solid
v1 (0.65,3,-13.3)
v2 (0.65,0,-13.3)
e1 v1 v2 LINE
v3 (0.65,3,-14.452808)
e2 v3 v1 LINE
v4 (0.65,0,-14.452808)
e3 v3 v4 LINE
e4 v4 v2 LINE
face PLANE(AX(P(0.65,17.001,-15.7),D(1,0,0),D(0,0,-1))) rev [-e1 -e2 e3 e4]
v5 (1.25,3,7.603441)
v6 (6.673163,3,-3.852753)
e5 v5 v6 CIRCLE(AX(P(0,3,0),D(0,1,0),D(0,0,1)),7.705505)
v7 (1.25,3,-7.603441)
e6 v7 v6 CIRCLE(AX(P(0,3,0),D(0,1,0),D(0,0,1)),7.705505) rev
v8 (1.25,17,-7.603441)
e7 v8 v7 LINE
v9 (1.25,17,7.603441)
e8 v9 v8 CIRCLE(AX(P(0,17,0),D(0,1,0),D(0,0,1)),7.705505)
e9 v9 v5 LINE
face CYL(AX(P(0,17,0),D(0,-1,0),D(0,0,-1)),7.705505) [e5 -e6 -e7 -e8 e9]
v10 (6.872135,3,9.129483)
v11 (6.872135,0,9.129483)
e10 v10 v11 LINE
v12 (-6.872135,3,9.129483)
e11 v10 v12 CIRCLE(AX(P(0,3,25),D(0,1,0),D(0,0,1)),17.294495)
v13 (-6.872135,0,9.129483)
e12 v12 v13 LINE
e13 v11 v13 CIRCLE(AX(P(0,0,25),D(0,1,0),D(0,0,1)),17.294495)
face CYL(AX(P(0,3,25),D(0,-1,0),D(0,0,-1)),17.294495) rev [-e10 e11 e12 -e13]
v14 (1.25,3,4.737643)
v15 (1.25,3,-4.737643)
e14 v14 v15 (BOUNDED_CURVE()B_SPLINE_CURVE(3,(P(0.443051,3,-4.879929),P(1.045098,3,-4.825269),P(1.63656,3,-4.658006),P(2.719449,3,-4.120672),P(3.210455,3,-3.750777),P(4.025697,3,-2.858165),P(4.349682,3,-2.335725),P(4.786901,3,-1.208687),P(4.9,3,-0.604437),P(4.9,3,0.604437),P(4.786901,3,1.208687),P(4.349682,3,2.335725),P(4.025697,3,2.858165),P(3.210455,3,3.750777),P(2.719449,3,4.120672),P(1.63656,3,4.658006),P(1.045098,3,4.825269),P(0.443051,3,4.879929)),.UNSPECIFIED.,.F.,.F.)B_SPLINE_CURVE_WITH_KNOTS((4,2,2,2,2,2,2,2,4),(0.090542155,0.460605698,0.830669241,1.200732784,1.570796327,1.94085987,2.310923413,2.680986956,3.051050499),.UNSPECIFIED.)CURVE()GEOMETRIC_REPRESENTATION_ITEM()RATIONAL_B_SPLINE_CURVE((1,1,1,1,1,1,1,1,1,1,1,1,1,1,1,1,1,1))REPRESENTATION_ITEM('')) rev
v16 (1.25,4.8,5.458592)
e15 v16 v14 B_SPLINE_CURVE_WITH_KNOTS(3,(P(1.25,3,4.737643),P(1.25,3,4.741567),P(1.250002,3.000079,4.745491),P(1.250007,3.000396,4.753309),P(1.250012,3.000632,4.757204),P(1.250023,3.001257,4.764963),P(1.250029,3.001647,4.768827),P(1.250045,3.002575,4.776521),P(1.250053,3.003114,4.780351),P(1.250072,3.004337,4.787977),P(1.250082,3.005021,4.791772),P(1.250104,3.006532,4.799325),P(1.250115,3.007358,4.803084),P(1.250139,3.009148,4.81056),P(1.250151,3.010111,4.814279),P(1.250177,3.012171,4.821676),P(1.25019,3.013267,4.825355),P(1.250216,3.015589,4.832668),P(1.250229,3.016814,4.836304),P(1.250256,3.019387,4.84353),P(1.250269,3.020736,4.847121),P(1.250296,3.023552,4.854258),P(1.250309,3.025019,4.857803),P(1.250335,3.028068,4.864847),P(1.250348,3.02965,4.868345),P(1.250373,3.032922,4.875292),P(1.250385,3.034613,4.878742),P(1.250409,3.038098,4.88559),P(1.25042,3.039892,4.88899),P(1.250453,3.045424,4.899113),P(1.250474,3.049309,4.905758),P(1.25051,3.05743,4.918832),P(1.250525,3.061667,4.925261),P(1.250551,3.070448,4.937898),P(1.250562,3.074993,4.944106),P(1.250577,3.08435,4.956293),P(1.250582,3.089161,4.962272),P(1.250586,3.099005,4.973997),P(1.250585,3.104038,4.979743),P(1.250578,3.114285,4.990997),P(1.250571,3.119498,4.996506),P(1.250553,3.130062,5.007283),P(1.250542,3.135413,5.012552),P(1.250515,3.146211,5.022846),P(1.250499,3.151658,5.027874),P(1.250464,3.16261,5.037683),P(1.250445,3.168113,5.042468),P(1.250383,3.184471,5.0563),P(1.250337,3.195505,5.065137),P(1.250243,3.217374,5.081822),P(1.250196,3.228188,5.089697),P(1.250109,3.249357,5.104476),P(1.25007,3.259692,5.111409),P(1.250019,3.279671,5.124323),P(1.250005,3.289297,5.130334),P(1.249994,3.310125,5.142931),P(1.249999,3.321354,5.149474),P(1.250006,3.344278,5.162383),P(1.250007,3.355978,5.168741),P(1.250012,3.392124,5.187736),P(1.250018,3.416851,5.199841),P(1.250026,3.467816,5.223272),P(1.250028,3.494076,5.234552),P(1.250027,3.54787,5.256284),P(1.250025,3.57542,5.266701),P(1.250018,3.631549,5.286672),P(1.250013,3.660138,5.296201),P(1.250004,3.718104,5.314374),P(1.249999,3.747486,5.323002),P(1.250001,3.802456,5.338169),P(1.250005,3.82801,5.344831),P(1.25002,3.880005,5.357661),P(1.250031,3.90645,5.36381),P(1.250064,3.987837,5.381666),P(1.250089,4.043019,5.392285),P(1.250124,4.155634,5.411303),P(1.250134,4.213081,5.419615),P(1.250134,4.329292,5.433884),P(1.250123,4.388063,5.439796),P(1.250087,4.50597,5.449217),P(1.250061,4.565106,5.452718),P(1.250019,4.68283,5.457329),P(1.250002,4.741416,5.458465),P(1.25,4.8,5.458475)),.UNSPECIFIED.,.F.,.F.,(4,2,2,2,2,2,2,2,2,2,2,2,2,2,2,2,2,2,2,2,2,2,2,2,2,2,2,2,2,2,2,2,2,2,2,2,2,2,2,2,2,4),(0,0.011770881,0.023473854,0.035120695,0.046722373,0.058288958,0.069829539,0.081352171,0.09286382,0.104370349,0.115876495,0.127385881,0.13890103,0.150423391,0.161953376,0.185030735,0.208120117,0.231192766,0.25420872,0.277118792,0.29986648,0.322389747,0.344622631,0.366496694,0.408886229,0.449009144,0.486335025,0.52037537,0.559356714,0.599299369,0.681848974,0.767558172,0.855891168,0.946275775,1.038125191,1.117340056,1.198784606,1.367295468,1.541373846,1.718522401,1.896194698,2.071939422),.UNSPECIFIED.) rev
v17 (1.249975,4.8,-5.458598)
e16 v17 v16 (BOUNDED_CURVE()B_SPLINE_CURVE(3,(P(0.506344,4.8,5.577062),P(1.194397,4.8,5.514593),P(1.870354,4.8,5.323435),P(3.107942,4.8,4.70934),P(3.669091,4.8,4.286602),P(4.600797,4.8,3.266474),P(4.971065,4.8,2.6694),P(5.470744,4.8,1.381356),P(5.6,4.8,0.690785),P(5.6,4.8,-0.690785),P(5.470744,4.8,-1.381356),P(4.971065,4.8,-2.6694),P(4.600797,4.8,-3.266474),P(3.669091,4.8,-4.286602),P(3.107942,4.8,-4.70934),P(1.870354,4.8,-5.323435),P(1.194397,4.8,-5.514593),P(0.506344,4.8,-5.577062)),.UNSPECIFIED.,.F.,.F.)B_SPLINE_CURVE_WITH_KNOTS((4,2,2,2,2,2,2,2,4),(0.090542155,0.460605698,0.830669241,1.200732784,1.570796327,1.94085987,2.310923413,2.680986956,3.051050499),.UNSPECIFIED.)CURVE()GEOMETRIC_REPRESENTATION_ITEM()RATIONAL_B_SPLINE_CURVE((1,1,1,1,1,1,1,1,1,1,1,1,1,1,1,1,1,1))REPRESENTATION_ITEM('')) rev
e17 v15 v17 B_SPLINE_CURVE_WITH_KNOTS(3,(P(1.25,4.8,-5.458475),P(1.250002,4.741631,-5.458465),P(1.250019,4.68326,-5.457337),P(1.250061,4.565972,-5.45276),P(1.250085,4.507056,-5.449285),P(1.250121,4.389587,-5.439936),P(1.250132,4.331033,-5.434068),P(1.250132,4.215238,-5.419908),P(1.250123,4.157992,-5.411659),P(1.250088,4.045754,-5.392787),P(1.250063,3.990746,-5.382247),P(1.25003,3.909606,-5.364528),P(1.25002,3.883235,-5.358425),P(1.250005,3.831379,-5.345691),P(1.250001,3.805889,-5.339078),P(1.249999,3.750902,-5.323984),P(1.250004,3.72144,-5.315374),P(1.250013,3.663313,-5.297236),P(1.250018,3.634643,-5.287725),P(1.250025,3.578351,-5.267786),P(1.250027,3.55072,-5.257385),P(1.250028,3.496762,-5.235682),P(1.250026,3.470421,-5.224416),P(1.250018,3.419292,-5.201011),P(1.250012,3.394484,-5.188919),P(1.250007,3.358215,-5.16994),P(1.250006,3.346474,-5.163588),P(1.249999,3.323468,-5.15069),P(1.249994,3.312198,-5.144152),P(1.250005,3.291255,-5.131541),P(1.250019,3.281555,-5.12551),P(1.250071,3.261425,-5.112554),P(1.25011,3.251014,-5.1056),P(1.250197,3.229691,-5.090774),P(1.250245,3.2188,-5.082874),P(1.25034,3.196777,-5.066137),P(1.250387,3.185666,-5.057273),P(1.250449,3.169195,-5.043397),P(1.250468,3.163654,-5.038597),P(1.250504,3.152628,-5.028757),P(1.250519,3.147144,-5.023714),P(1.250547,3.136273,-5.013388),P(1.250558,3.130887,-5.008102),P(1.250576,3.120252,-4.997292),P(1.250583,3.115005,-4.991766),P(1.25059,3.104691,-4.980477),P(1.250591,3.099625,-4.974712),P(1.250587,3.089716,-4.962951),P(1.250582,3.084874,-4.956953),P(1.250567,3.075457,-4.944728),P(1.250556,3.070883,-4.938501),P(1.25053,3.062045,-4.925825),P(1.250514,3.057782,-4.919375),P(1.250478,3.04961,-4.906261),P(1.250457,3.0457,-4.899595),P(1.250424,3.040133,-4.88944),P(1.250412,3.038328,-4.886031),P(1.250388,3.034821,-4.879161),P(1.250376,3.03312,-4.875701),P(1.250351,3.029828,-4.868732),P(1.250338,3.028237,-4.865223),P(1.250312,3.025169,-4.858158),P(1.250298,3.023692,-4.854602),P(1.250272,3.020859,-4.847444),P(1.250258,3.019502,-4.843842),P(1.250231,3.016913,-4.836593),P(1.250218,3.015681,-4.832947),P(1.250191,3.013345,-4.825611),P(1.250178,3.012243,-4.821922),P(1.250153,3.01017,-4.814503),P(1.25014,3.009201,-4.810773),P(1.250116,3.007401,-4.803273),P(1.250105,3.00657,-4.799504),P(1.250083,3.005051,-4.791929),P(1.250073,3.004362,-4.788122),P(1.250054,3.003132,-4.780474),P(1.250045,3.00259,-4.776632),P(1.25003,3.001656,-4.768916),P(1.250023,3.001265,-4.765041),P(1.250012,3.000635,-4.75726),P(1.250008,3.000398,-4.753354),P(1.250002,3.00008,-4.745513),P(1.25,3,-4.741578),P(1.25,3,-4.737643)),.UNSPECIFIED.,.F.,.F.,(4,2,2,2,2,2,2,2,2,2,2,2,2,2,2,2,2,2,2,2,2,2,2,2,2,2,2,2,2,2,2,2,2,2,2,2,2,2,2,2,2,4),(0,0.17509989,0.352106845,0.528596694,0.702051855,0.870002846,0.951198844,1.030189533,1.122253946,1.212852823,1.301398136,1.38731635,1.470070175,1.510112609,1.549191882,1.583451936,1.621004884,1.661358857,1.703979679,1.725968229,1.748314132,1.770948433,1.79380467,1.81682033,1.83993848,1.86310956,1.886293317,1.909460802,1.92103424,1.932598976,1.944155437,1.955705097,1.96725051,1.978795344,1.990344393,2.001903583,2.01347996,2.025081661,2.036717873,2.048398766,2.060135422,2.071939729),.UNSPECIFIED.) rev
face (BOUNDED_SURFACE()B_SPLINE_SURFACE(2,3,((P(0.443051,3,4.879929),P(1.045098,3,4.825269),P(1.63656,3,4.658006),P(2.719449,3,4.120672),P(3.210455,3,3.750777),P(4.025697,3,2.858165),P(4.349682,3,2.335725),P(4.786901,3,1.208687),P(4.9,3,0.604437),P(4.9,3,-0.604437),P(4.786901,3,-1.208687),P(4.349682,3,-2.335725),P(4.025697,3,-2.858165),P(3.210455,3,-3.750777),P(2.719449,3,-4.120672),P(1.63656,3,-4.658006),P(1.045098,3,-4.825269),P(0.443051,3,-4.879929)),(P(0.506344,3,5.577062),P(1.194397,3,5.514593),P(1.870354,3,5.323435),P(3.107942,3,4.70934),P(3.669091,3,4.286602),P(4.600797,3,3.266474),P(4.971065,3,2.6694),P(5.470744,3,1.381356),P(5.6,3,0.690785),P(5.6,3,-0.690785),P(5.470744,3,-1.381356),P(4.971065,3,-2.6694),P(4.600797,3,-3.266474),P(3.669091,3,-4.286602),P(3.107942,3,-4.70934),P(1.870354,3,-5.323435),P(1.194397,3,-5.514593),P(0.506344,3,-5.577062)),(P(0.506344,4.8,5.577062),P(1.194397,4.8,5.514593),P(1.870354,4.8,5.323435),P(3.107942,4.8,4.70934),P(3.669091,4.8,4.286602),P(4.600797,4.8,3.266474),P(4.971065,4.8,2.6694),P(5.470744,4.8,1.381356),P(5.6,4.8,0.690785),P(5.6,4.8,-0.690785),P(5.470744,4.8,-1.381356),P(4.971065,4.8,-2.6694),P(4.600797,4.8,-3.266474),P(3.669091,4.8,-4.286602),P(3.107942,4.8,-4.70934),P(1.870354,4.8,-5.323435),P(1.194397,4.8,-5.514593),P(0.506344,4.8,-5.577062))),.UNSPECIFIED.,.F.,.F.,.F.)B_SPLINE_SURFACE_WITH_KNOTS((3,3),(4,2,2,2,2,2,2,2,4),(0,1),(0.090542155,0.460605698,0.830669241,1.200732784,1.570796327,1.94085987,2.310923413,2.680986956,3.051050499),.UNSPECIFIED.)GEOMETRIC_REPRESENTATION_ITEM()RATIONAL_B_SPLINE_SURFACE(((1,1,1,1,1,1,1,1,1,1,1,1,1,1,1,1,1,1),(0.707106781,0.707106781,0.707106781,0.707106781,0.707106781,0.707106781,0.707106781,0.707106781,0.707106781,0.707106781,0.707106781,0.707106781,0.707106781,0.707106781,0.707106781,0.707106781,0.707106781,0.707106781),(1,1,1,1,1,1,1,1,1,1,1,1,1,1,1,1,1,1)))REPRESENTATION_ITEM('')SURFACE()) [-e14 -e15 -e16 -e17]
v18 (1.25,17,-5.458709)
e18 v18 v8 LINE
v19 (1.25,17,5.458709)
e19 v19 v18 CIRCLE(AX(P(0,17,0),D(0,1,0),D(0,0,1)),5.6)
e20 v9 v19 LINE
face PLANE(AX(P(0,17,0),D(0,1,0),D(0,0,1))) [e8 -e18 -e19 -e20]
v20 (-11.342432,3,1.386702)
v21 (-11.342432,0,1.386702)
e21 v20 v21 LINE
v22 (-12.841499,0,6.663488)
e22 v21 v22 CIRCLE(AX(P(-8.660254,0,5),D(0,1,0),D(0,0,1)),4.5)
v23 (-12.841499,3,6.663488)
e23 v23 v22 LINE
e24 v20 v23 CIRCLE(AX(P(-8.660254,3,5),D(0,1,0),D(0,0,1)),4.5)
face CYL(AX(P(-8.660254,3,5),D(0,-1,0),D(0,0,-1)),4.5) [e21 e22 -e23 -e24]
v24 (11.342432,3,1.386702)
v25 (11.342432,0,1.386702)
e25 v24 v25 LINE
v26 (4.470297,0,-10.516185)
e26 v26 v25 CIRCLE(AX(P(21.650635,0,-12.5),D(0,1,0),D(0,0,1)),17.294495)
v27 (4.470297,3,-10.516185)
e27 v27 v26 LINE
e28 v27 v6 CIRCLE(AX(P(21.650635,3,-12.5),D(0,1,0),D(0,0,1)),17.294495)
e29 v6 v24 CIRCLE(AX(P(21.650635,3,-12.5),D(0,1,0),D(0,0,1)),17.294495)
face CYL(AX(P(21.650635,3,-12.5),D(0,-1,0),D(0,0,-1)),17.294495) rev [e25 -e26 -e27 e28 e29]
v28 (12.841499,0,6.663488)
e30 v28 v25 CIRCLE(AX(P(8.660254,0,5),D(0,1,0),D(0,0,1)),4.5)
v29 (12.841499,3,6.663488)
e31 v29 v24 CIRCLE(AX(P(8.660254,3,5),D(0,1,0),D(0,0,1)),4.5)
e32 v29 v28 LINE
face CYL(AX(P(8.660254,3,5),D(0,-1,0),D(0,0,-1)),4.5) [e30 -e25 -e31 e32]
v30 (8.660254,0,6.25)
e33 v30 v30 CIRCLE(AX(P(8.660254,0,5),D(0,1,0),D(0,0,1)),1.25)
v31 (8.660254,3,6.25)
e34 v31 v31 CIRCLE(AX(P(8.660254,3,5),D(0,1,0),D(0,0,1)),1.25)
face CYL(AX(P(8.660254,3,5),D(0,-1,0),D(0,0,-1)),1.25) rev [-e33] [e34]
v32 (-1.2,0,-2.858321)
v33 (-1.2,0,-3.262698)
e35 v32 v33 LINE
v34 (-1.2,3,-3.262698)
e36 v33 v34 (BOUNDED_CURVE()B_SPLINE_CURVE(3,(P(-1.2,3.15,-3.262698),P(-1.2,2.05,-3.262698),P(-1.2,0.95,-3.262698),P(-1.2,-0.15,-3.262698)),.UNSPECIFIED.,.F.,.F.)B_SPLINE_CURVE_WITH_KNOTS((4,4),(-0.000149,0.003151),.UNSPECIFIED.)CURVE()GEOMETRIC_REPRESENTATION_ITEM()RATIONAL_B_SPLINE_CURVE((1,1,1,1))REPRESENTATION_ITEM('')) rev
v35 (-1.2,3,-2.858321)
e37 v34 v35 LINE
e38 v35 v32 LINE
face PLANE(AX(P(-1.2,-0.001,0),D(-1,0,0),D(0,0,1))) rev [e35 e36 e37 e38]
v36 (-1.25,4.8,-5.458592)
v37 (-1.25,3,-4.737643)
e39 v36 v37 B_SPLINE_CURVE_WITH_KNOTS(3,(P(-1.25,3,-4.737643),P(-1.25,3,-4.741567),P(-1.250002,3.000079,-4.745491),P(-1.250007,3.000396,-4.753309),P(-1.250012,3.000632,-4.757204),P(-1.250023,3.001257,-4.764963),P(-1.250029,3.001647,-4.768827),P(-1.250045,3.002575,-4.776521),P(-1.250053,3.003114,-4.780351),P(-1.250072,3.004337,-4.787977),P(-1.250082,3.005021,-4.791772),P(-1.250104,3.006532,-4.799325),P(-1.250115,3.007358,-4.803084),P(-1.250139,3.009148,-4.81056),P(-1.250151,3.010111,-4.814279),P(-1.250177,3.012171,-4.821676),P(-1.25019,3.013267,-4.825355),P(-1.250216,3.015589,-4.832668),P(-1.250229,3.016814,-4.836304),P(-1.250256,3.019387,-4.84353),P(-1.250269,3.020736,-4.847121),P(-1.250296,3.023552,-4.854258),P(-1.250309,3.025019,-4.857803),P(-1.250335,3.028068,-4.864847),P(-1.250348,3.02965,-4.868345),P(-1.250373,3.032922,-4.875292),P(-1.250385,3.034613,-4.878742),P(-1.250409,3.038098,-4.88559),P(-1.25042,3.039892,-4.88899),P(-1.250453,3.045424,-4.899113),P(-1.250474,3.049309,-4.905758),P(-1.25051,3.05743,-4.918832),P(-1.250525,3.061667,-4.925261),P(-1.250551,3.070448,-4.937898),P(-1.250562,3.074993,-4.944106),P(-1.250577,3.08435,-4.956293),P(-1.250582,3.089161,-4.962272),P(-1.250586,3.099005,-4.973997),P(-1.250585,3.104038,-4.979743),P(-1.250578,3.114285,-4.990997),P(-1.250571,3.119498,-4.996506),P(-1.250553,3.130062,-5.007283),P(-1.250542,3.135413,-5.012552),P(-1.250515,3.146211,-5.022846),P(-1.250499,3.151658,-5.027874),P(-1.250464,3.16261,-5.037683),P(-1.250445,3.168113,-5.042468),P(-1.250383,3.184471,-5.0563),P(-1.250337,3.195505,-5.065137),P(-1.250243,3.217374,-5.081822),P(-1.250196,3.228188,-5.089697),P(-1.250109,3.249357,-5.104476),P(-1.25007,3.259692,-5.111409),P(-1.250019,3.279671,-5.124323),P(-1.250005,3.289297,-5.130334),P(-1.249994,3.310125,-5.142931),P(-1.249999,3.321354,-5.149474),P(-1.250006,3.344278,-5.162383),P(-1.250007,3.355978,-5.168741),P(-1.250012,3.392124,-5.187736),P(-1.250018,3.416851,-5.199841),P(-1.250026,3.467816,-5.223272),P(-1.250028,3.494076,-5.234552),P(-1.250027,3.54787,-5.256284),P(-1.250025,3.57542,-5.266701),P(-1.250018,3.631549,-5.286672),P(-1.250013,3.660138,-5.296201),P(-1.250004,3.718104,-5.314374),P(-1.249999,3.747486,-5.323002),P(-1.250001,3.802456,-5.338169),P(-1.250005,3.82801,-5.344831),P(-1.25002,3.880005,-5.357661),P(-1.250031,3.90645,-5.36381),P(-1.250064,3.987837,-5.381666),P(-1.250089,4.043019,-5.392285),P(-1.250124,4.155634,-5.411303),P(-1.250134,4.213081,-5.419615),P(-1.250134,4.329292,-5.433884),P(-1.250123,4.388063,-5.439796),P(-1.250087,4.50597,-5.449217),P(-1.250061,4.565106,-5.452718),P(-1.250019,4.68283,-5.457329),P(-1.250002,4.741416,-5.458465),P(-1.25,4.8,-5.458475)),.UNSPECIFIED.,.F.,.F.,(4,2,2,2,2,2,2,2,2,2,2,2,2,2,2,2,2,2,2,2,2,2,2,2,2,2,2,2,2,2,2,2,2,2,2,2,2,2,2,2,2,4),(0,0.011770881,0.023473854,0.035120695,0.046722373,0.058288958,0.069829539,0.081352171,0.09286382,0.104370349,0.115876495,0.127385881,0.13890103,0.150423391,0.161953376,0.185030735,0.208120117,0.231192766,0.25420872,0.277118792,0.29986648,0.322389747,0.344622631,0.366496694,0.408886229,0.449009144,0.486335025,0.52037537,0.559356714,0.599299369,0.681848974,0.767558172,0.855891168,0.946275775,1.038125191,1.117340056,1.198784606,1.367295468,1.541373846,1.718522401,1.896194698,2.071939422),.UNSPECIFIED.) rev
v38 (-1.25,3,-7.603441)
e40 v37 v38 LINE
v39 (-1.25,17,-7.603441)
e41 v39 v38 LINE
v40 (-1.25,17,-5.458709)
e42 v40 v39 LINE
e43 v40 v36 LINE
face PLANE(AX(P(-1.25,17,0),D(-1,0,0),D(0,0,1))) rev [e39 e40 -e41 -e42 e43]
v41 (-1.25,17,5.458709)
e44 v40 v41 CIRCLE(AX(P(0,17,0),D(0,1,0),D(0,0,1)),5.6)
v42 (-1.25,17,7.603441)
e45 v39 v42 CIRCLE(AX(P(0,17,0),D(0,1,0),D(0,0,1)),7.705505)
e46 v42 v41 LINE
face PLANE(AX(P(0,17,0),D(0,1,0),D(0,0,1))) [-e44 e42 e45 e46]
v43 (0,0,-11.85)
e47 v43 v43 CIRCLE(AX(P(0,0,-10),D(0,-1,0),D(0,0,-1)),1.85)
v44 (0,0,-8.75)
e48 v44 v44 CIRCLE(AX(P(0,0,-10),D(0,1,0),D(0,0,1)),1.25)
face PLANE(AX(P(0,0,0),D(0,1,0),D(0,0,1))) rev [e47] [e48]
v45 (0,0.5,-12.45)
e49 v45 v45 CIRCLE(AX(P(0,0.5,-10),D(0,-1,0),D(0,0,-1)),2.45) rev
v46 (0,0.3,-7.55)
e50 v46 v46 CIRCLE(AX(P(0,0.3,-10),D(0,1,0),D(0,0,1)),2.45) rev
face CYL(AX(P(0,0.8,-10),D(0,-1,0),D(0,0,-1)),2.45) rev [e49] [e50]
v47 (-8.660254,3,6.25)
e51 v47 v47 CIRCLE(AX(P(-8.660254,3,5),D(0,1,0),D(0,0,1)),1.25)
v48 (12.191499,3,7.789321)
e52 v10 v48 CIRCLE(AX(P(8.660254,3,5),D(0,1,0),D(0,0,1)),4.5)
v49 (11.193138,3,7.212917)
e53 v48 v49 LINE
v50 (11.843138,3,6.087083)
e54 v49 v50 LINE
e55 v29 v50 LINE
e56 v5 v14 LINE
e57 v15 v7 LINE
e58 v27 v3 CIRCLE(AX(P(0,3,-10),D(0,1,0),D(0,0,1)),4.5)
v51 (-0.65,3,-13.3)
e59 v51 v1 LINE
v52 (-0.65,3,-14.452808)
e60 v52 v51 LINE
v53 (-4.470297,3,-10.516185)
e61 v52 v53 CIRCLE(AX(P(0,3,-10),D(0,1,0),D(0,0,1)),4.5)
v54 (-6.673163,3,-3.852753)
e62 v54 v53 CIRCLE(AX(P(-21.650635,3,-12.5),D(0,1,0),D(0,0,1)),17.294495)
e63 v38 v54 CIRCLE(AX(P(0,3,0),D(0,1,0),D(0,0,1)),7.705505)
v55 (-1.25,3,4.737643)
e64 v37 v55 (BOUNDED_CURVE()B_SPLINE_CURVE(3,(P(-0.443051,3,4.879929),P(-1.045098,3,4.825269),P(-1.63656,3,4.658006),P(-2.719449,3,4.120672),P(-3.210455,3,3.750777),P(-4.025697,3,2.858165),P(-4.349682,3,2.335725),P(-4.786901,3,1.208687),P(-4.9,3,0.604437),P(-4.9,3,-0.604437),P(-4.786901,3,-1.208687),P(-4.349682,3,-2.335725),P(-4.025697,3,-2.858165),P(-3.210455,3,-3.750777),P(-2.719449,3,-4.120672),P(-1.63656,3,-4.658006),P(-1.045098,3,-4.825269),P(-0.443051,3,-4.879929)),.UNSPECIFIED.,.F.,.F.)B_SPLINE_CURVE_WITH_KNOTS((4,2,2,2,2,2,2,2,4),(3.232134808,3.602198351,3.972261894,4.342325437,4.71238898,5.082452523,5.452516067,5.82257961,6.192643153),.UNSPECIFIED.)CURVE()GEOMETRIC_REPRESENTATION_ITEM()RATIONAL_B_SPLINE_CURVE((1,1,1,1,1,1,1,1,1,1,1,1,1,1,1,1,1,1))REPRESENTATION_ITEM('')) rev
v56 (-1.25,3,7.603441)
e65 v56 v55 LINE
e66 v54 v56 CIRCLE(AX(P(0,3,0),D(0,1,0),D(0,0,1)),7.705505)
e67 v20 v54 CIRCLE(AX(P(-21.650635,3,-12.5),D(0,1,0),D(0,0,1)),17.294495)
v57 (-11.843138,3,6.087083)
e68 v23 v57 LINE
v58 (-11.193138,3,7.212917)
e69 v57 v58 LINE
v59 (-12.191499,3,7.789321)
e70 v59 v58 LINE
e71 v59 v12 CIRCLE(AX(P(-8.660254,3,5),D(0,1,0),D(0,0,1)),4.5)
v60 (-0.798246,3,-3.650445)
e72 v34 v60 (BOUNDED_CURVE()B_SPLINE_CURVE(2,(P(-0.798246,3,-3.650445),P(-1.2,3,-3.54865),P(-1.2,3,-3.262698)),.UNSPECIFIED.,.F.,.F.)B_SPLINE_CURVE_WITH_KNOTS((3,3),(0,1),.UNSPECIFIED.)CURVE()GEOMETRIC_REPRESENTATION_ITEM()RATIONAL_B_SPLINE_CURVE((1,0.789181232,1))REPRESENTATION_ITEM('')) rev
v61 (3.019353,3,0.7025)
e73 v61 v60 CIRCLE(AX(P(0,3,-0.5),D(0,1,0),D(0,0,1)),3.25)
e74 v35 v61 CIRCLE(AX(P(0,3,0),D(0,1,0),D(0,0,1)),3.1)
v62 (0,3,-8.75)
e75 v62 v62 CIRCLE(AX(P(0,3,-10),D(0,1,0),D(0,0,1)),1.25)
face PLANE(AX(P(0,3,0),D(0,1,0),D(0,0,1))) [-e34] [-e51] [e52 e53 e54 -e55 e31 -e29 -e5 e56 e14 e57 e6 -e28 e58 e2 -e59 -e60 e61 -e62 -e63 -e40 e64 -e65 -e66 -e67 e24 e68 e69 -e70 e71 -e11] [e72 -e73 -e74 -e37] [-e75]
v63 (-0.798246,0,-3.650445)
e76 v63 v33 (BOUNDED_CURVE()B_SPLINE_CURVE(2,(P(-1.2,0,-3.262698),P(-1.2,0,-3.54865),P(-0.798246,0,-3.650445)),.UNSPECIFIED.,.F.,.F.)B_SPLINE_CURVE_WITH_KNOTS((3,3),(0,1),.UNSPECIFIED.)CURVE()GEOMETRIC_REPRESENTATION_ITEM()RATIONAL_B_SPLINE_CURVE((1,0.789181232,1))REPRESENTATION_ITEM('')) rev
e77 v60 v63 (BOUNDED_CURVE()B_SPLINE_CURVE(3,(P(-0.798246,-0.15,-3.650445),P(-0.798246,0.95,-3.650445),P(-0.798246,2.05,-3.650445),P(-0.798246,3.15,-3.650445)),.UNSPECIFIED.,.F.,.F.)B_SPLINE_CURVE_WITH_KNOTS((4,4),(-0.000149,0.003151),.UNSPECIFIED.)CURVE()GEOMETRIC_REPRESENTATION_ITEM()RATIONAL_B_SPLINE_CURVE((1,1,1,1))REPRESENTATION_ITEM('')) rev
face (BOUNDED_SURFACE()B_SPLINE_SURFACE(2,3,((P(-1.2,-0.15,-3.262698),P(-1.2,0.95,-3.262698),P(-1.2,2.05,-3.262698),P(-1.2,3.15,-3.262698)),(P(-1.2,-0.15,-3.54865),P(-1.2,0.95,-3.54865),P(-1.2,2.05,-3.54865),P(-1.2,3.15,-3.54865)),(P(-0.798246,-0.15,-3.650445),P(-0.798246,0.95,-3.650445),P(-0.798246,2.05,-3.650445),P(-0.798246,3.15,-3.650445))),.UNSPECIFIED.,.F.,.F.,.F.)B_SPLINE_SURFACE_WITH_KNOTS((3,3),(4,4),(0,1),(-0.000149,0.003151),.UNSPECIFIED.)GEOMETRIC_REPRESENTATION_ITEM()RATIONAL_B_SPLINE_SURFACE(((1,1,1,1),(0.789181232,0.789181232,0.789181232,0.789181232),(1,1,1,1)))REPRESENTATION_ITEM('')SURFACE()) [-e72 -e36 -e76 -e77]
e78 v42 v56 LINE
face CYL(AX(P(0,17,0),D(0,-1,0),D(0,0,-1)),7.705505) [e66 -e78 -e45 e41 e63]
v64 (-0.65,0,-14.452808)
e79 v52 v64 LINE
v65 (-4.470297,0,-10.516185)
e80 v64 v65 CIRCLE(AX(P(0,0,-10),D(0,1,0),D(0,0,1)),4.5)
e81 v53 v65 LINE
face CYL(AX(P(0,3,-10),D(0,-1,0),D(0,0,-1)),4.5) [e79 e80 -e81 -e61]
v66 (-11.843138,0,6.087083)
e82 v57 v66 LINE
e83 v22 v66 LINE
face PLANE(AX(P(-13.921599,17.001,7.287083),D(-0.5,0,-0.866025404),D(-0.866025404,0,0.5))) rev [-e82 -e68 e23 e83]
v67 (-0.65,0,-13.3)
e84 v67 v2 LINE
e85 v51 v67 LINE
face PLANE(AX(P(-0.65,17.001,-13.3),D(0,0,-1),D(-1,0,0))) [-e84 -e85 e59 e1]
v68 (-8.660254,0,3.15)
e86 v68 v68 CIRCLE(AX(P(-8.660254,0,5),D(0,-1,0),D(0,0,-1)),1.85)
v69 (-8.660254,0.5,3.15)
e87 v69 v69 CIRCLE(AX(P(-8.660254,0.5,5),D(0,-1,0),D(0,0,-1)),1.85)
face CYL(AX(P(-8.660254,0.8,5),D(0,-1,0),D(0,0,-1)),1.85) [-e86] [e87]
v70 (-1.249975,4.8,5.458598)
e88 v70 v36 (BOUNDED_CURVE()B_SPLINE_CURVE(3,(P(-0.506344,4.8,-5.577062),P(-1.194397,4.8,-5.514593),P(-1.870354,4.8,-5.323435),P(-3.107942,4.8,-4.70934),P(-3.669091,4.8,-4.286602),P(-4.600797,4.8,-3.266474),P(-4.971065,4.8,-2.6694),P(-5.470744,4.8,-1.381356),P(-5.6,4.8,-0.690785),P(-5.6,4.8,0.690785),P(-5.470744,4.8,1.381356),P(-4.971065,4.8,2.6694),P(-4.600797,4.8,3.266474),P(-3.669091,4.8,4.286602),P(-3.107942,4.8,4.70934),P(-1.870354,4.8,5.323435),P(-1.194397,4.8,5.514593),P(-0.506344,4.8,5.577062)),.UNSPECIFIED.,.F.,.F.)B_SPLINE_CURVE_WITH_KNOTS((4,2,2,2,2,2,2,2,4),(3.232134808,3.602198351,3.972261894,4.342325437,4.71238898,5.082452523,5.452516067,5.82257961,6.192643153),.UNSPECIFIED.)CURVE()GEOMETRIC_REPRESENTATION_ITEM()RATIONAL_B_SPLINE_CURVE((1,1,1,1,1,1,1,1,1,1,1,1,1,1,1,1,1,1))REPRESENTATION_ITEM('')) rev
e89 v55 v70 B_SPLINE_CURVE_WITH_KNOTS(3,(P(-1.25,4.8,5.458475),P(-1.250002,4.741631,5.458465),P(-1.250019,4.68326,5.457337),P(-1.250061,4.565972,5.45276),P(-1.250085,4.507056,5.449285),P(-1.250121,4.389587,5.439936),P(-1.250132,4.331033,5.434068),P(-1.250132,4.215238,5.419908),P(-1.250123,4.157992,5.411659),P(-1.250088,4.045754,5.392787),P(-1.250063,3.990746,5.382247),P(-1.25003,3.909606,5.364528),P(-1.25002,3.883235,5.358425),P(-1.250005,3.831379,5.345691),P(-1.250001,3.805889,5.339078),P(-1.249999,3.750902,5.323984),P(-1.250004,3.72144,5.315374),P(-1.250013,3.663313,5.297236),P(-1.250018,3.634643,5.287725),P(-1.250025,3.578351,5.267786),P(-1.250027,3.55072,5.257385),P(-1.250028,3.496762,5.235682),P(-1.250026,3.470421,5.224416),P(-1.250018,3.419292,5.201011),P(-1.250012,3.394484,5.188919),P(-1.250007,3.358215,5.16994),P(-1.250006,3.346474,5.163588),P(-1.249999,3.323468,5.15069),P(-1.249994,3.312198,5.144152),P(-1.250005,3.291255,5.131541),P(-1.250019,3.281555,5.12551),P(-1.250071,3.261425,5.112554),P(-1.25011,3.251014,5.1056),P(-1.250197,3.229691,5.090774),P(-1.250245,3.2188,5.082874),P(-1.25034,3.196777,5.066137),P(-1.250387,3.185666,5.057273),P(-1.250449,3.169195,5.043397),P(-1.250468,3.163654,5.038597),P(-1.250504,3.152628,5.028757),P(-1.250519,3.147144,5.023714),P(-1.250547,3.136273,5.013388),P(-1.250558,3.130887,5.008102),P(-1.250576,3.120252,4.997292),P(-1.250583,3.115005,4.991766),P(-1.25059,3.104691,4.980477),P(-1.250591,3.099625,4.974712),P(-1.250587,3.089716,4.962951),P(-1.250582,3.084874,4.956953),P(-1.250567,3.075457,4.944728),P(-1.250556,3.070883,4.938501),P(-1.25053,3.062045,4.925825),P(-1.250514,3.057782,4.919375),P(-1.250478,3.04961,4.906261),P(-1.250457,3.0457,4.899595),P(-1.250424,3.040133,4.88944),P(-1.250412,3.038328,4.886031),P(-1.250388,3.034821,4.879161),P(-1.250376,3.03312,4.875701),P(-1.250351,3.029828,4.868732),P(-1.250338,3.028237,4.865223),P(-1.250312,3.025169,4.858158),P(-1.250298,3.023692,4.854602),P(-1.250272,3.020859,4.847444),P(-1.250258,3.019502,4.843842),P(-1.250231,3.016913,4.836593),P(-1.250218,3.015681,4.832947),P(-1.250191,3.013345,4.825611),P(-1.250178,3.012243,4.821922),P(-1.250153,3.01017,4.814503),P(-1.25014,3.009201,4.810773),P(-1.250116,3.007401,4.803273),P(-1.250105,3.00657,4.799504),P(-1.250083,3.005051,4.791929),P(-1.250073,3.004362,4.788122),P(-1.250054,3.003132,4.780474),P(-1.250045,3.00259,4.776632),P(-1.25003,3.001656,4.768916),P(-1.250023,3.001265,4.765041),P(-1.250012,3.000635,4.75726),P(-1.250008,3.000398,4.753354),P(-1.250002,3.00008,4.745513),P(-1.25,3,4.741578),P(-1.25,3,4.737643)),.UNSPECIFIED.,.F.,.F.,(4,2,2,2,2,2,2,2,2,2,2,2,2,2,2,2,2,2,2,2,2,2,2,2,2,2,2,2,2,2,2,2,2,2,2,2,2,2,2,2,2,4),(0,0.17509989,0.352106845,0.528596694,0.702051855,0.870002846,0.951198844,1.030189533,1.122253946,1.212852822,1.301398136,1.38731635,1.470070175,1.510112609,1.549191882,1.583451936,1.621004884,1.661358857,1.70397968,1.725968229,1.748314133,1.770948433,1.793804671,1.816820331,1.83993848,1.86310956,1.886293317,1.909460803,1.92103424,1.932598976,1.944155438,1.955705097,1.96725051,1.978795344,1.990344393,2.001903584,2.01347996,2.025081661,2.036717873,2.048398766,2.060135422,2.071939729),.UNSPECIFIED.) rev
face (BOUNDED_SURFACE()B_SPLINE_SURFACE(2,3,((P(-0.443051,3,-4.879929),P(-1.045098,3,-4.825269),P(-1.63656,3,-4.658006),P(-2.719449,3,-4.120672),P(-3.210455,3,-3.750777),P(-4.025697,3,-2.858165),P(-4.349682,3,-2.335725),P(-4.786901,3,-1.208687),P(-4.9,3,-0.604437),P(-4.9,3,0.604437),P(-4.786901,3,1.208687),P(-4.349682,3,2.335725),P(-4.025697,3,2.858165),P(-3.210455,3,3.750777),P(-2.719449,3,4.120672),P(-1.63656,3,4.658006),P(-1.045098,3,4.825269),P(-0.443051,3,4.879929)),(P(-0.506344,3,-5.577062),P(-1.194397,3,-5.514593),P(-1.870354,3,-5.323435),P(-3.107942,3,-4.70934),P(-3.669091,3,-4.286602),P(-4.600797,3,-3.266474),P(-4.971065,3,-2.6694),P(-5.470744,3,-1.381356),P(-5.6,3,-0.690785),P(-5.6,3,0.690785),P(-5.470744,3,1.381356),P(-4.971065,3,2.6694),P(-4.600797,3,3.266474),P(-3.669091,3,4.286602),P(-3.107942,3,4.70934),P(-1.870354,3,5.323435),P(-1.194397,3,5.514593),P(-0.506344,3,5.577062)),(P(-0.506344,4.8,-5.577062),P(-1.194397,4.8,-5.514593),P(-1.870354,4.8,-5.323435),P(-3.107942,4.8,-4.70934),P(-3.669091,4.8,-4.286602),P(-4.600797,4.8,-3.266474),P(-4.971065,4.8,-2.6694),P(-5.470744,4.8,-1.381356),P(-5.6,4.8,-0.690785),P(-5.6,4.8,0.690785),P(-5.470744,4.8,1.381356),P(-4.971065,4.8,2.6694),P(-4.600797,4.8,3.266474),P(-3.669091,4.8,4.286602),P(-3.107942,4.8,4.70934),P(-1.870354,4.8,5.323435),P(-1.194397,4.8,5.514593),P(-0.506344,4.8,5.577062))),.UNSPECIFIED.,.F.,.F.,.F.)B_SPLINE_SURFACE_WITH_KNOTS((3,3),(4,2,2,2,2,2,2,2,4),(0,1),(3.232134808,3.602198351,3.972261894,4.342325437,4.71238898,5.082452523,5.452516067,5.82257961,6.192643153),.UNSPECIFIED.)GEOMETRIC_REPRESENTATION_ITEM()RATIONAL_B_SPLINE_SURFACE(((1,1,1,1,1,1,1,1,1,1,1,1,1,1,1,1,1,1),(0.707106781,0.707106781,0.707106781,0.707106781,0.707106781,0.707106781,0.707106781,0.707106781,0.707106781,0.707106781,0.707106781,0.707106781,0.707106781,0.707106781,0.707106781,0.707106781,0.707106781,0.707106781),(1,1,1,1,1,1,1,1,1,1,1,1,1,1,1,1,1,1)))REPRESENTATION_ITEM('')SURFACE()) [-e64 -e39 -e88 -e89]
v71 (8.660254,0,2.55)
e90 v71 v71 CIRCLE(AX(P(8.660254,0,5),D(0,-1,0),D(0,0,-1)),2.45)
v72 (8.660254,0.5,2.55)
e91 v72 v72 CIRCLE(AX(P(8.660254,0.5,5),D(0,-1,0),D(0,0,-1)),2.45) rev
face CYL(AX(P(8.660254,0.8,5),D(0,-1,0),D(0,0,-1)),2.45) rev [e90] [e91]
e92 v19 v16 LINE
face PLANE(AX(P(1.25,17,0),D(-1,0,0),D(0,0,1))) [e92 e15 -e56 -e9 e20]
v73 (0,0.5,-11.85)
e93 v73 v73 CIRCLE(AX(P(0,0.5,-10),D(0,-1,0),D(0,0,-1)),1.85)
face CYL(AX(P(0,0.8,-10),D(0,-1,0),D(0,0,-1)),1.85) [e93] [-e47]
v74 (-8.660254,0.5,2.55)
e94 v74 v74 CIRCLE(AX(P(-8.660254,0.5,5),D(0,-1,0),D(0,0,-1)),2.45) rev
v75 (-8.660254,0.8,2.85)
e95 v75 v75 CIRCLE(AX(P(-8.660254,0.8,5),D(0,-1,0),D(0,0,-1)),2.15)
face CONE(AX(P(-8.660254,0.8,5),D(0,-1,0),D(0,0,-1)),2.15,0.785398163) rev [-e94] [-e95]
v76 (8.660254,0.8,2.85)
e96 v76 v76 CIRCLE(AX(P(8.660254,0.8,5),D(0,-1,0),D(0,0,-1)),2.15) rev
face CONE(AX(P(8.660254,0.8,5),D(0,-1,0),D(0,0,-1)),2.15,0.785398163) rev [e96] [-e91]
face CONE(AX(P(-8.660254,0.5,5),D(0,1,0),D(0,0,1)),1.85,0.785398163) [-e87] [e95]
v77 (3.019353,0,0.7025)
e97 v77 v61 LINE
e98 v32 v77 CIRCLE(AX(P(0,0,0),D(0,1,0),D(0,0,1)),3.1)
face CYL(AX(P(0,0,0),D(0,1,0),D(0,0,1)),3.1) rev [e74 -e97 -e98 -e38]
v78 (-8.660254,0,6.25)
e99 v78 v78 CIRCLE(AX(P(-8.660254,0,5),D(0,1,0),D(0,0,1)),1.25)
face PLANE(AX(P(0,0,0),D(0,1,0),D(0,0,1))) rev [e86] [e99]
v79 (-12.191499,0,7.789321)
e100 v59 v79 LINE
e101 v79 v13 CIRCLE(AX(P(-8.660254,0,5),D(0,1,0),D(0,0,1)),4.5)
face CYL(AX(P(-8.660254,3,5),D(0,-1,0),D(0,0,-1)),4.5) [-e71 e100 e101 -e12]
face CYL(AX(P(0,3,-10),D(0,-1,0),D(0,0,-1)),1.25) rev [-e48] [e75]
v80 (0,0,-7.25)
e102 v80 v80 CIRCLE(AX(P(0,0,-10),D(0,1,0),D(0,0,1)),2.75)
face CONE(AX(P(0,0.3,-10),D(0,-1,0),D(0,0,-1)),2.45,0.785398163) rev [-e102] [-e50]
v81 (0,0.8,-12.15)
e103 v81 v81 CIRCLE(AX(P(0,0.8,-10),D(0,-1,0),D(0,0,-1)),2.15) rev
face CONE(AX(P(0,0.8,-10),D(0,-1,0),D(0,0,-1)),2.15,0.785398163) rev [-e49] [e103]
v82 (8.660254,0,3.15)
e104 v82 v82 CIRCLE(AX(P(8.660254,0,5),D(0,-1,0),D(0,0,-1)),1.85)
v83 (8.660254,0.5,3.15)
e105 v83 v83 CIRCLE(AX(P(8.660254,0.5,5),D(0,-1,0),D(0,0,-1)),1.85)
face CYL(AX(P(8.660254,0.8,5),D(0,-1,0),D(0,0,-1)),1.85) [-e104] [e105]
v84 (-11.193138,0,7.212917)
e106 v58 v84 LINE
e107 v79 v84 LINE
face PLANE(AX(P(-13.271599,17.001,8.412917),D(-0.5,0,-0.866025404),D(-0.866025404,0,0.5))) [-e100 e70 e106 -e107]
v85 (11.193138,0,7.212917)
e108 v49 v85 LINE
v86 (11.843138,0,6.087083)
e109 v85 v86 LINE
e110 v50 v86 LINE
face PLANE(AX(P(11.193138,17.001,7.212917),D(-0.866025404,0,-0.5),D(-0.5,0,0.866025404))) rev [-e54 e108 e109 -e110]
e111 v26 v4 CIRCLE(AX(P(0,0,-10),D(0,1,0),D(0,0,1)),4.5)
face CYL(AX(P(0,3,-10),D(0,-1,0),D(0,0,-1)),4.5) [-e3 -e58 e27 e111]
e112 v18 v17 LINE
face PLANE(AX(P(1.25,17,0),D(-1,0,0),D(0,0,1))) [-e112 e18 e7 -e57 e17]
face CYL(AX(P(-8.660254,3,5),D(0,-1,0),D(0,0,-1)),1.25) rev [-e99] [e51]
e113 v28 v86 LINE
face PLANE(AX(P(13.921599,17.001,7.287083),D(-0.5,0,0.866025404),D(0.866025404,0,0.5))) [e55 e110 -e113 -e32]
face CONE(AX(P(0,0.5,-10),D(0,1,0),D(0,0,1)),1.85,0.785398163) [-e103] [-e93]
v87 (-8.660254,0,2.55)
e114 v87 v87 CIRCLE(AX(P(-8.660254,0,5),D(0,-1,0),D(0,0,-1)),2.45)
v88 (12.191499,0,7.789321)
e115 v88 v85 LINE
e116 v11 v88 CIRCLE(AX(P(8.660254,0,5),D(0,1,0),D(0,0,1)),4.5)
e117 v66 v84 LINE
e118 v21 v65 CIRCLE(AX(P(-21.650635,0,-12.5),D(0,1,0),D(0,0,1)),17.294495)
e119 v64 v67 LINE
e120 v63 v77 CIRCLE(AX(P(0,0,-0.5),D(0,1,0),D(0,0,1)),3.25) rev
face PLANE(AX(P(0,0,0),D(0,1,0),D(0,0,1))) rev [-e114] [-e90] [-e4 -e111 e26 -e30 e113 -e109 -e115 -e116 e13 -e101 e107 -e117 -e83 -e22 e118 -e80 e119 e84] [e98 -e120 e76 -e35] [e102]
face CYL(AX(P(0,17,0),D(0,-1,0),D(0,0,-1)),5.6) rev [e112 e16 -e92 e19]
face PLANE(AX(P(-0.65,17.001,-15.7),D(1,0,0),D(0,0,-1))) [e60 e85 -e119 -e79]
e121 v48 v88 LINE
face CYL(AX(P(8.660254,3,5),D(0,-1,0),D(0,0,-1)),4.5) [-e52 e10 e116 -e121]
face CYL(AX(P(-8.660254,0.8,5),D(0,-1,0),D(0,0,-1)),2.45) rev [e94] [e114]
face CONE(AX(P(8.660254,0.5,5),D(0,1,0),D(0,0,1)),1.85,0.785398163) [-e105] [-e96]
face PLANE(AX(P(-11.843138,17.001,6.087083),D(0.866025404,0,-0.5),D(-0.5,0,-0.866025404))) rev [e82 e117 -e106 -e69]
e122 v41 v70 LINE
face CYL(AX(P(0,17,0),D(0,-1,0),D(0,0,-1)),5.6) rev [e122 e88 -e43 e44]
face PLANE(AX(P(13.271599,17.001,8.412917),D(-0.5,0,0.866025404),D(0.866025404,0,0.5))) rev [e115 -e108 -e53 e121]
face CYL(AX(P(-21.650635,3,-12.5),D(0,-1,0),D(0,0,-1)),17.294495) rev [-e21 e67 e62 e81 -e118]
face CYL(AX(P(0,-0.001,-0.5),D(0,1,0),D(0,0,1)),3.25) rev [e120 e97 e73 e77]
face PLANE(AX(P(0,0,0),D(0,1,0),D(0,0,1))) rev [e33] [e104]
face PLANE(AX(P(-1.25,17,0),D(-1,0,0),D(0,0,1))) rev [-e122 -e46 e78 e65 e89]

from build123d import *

# Parameters (mm, degrees)
SKETCH1_R           = 1.25
BOSS_EXTRUDE1_DEPTH = 3
SKETCH8_R           = 2.45
SKETCH8_R_2         = 1.85
CUT_EXTRUDE3_DEPTH  = 0.8
CHAMFER4_SIZE       = 0.3
SKETCH9_R           = 3.1
CUT_EXTRUDE4_DEPTH  = 20.810156141
BOSS_EXTRUDE2_DEPTH = 14
CUT_EXTRUDE5_REACH  = 27.931
SKETCH11_W          = 1.3
SKETCH11_H          = 2.4
FILLET1_SIZE        = 0.7
FILLET1_SIZE_2      = 1.8
CUT_EXTRUDE6_REACH  = 26.043


# Some blends are built 0.0001 mm under size
with BuildPart() as part:
    # Sketch1 → Boss-Extrude1 (new body)
    with BuildSketch(Plane(origin=(0, 0, 0), x_dir=(1, 0, 0), z_dir=(0, 1, 0))):
        with BuildLine():
            ThreePointArc((4.470296705, 10.516185401), (0, 14.5), (-4.470296705, 10.516185401))
            ThreePointArc((-4.470296705, 10.516185401), (-6.673163323, 3.852752641), (-11.342432061, -1.386702192))
            ThreePointArc((-11.342432061, -1.386702192), (-12.557368355, -7.25), (-6.872135356, -9.12948321))
            ThreePointArc((-6.872135356, -9.12948321), (0, -7.705505282), (6.872135356, -9.12948321))
            ThreePointArc((6.872135356, -9.12948321), (12.557368355, -7.25), (11.342432061, -1.386702192))
            ThreePointArc((11.342432061, -1.386702192), (6.673163323, 3.852752641), (4.470296705, 10.516185401))
        make_face()
        with Locations(Location((0, 10, 0), (0, 0, 270))):
            Circle(SKETCH1_R, mode=Mode.SUBTRACT)
        with Locations(Location((-8.660254038, -5, 0), (0, 0, 270))):
            Circle(SKETCH1_R, mode=Mode.SUBTRACT)
        with Locations(Location((8.660254038, -5, 0), (0, 0, 270))):
            Circle(SKETCH1_R, mode=Mode.SUBTRACT)
    extrude(amount=BOSS_EXTRUDE1_DEPTH)

    # Sketch8 → Cut-Extrude3 (cut)
    # profile 1 of 3: a face of its own
    with BuildSketch(Plane.XZ):
        with Locations(Location((8.660254038, 5, 0), (0, 0, 270))):
            Circle(SKETCH8_R)
        with Locations(Location((8.660254038, 5, 0), (0, 0, 270))):
            Circle(SKETCH8_R_2, mode=Mode.SUBTRACT)
    # profile 2 of 3: a face of its own
    with BuildSketch(Plane.XZ):
        with Locations(Location((-8.660254038, 5, 0), (0, 0, 270))):
            Circle(SKETCH8_R)
        with Locations(Location((-8.660254038, 5, 0), (0, 0, 270))):
            Circle(SKETCH8_R_2, mode=Mode.SUBTRACT)
    # profile 3 of 3: a face of its own
    with BuildSketch(Plane.XZ):
        with Locations(Location((0, -10, 0), (0, 0, 270))):
            Circle(SKETCH8_R)
        with Locations(Location((0, -10, 0), (0, 0, 270))):
            Circle(SKETCH8_R_2, mode=Mode.SUBTRACT)
    extrude(amount=-CUT_EXTRUDE3_DEPTH, mode=Mode.SUBTRACT)

    # Chamfer4
    chamfer4_edges = [part.edges().sort_by_distance(p)[0] for p in [
        (8.660254038, 0.8, 7.45),
        (8.660254038, 0.8, 6.85),
        (-8.660254038, 0.8, 7.45),
        (-8.660254038, 0.8, 6.85),
        (0, 0.8, -7.55),
        (0, 0.8, -8.15),
        (0, 0, -7.55),
    ]]
    chamfer(chamfer4_edges, length=CHAMFER4_SIZE - 0.0001)  # a hair under: the kernel refuses the full size

    # Sketch9 → Cut-Extrude4 (cut, through all)
    with BuildSketch(Plane(origin=(0, 3, 0), x_dir=(1, 0, 0), z_dir=(0, 1, 0))):
        with Locations(Location((0, 0, 0), (0, 0, 270))):
            Circle(SKETCH9_R)
    extrude(amount=-CUT_EXTRUDE4_DEPTH, mode=Mode.SUBTRACT)

    # Sketch10 → Boss-Extrude2 (add)
    with BuildSketch(Plane(origin=(0, 3, 0), x_dir=(1, 0, 0), z_dir=(0, 1, 0))):
        with BuildLine():
            ThreePointArc((-1.25, 7.603440777), (-7.705505282, 0), (-1.25, -7.603440777))
            Line((-1.25, -7.603440777), (-1.25, -5.458708638))
            ThreePointArc((-1.25, -5.458708638), (-5.6, 0), (-1.25, 5.458708638))
            Line((-1.25, 5.458708638), (-1.25, 7.603440777))
        make_face()
        with BuildLine():
            Line((1.25, -5.458708638), (1.25, -7.603440777))
            ThreePointArc((1.25, -7.603440777), (5.873954939, -4.987129939), (7.705505282, 0))
            ThreePointArc((7.705505282, 0), (5.873954939, 4.987129939), (1.25, 7.603440777))
            Line((1.25, 7.603440777), (1.25, 5.458708638))
            ThreePointArc((1.25, 5.458708638), (4.379497688, 3.489985673), (5.6, 0))
            ThreePointArc((5.6, 0), (4.379497688, -3.489985673), (1.25, -5.458708638))
        make_face()
    extrude(amount=BOSS_EXTRUDE2_DEPTH)

    # Sketch11 → Cut-Extrude5 (cut, up to next)
    with BuildSketch(Plane.XZ, mode=Mode.PRIVATE) as cut_extrude5_sk1:
        Polygon((13.271598839, 8.412916512), (11.19313787, 7.212916512), (11.84313787, 6.087083488), (13.921598839, 7.287083488), align=None)
    cut_extrude5_tool1 = extrude(cut_extrude5_sk1.sketch, amount=-CUT_EXTRUDE5_REACH, mode=Mode.PRIVATE) & part.part
    # Sketch11 → Cut-Extrude5 (cut, up to next)
    with BuildSketch(Plane.XZ, mode=Mode.PRIVATE) as cut_extrude5_sk2:
        Polygon((-13.921598839, 7.287083488), (-11.84313787, 6.087083488), (-11.19313787, 7.212916512), (-13.271598839, 8.412916512), align=None)
    cut_extrude5_tool2 = extrude(cut_extrude5_sk2.sketch, amount=-CUT_EXTRUDE5_REACH, mode=Mode.PRIVATE) & part.part
    # Sketch11 → Cut-Extrude5 (cut, up to next)
    with BuildSketch(Plane.XZ, mode=Mode.PRIVATE) as cut_extrude5_sk3:
        with Locations((0, -14.5)):
            Rectangle(SKETCH11_W, SKETCH11_H)
    cut_extrude5_tool3 = extrude(cut_extrude5_sk3.sketch, amount=-CUT_EXTRUDE5_REACH, mode=Mode.PRIVATE) & part.part
    add(cut_extrude5_tool1.solids().sort_by_distance((12.557368, 0, 7.25))[0], mode=Mode.SUBTRACT)
    add(cut_extrude5_tool2.solids().sort_by_distance((-12.557368, 0, 7.25))[0], mode=Mode.SUBTRACT)
    add(cut_extrude5_tool3.solids().sort_by_distance((0, 0, -14.5))[0], mode=Mode.SUBTRACT)

    # Fillet1
    # an asymmetric fillet: 1.8, 0.7 mm, written as the material it adds along each edge
    with BuildSketch(Plane(origin=(0, 3, 0), x_dir=(0.5475293805867771, 0, 0.8367864586585159), z_dir=(0.8367864586585159, 0, -0.5475293805867771))) as fillet1_piece_1_section:
        with BuildLine():
            Bezier((5.6 - FILLET1_SIZE, 0), (5.6, 0), (5.6, -FILLET1_SIZE_2), weights=[1, 0.707106781, 1])
            Line((5.6, -FILLET1_SIZE_2), (5.6, 0))
            Line((5.6, 0), (5.6 - FILLET1_SIZE, 0))
        make_face()
    fillet1_piece_1 = revolve(axis=Axis((0, 3, 0), (0, -1, 0)), revolution_arc=246.395365409, mode=Mode.PRIVATE)
    fillet1_piece_1 = split(fillet1_piece_1, bisect_by=Plane(origin=(1.25, 3.4101004, 4.981961309), z_dir=(1, 0, 0)), keep=Keep.TOP, mode=Mode.PRIVATE)
    add(fillet1_piece_1)
    with BuildSketch(Plane(origin=(0, 3, 0), x_dir=(0.5475293805867771, 0, 0.8367864586585159), z_dir=(0.8367864586585159, 0, -0.5475293805867771))) as fillet1_piece_2_section:
        with BuildLine():
            Bezier((5.6 - FILLET1_SIZE, 0), (5.6, 0), (5.6, -FILLET1_SIZE_2), weights=[1, 0.707106781, 1])
            Line((5.6, -FILLET1_SIZE_2), (5.6, 0))
            Line((5.6, 0), (5.6 - FILLET1_SIZE, 0))
        make_face()
    fillet1_piece_2 = revolve(axis=Axis((0, 3, 0), (0, -1, 0)), revolution_arc=246.395365409, mode=Mode.PRIVATE)
    fillet1_piece_2 = split(fillet1_piece_2, bisect_by=Plane(origin=(-1.25, 3.521482182, 0), z_dir=(-1, 0, 0)), keep=Keep.TOP, mode=Mode.PRIVATE)
    add(fillet1_piece_2)
    with BuildSketch(Plane(origin=(0, 3, 0), x_dir=(-0.5475293805867888, 0, -0.8367864586585083), z_dir=(-0.8367864586585083, 0, 0.5475293805867888))) as fillet1_piece_3_section:
        with BuildLine():
            Bezier((5.6 - FILLET1_SIZE, 0), (5.6, 0), (5.6, -FILLET1_SIZE_2), weights=[1, 0.707106781, 1])
            Line((5.6, -FILLET1_SIZE_2), (5.6, 0))
            Line((5.6, 0), (5.6 - FILLET1_SIZE, 0))
        make_face()
    fillet1_piece_3 = revolve(axis=Axis((0, 3, 0), (0, -1, 0)), revolution_arc=246.395365409, mode=Mode.PRIVATE)
    fillet1_piece_3 = split(fillet1_piece_3, bisect_by=Plane(origin=(-1.25, 3.4101004, -4.981961309), z_dir=(-1, 0, 0)), keep=Keep.TOP, mode=Mode.PRIVATE)
    add(fillet1_piece_3)
    with BuildSketch(Plane(origin=(0, 3, 0), x_dir=(-0.5475293805867888, 0, -0.8367864586585083), z_dir=(-0.8367864586585083, 0, 0.5475293805867888))) as fillet1_piece_4_section:
        with BuildLine():
            Bezier((5.6 - FILLET1_SIZE, 0), (5.6, 0), (5.6, -FILLET1_SIZE_2), weights=[1, 0.707106781, 1])
            Line((5.6, -FILLET1_SIZE_2), (5.6, 0))
            Line((5.6, 0), (5.6 - FILLET1_SIZE, 0))
        make_face()
    fillet1_piece_4 = revolve(axis=Axis((0, 3, 0), (0, -1, 0)), revolution_arc=246.395365409, mode=Mode.PRIVATE)
    fillet1_piece_4 = split(fillet1_piece_4, bisect_by=Plane(origin=(1.25, 3.521482182, 0), z_dir=(1, 0, 0)), keep=Keep.TOP, mode=Mode.PRIVATE)
    add(fillet1_piece_4)

    # Sketch13 → Cut-Extrude6 (cut, up to next)
    with BuildSketch(Plane(origin=(0, 3, 0), x_dir=(1, 0, 0), z_dir=(0, 1, 0)), mode=Mode.PRIVATE) as cut_extrude6_sk1:
        with BuildLine():
            Line((-1.2, 3.520347662), (-1.2, 2.858321186))
            ThreePointArc((-1.2, 2.858321186), (1.71610023, 2.581666129), (3.1, 0))
            ThreePointArc((3.1, 0), (3.079772307, -0.353556981), (3.019353201, -0.7025))
            ThreePointArc((3.019353201, -0.7025), (3.1918175, -0.112209971), (3.25, 0.5))
            ThreePointArc((3.25, 0.5), (1.825171225, 3.189098362), (-1.2, 3.520347662))
        make_face()
    cut_extrude6_tool1 = extrude(cut_extrude6_sk1.sketch, amount=-CUT_EXTRUDE6_REACH, mode=Mode.PRIVATE) & part.part
    add(cut_extrude6_tool1.solids().sort_by_distance((1.789819, 3, -3.137012))[0], mode=Mode.SUBTRACT)

    # Fillet2
    # an asymmetric fillet: 0.5, 0.4 mm, written as the material it adds along each edge
    with BuildSketch(Plane(origin=(-1.2, 3, -3.520347662), x_dir=(0.9513626370568626, 0, -0.3080732588398615), z_dir=(0, -1, 0))) as fillet2_piece_1:
        with BuildLine():
            Bezier((0.422293635, 0), (0.008719291, -0.026926088), (-0.079374984, 0.245118303), weights=[1, 0.789181232, 1])
            Line((-0.079374984, 0.245118303), (0, 0))
            ThreePointArc((0, 0), (0.211146817, -0.006866173), (0.422293635, 0))
        make_face()
    extrude(amount=3)


solid = part.part
